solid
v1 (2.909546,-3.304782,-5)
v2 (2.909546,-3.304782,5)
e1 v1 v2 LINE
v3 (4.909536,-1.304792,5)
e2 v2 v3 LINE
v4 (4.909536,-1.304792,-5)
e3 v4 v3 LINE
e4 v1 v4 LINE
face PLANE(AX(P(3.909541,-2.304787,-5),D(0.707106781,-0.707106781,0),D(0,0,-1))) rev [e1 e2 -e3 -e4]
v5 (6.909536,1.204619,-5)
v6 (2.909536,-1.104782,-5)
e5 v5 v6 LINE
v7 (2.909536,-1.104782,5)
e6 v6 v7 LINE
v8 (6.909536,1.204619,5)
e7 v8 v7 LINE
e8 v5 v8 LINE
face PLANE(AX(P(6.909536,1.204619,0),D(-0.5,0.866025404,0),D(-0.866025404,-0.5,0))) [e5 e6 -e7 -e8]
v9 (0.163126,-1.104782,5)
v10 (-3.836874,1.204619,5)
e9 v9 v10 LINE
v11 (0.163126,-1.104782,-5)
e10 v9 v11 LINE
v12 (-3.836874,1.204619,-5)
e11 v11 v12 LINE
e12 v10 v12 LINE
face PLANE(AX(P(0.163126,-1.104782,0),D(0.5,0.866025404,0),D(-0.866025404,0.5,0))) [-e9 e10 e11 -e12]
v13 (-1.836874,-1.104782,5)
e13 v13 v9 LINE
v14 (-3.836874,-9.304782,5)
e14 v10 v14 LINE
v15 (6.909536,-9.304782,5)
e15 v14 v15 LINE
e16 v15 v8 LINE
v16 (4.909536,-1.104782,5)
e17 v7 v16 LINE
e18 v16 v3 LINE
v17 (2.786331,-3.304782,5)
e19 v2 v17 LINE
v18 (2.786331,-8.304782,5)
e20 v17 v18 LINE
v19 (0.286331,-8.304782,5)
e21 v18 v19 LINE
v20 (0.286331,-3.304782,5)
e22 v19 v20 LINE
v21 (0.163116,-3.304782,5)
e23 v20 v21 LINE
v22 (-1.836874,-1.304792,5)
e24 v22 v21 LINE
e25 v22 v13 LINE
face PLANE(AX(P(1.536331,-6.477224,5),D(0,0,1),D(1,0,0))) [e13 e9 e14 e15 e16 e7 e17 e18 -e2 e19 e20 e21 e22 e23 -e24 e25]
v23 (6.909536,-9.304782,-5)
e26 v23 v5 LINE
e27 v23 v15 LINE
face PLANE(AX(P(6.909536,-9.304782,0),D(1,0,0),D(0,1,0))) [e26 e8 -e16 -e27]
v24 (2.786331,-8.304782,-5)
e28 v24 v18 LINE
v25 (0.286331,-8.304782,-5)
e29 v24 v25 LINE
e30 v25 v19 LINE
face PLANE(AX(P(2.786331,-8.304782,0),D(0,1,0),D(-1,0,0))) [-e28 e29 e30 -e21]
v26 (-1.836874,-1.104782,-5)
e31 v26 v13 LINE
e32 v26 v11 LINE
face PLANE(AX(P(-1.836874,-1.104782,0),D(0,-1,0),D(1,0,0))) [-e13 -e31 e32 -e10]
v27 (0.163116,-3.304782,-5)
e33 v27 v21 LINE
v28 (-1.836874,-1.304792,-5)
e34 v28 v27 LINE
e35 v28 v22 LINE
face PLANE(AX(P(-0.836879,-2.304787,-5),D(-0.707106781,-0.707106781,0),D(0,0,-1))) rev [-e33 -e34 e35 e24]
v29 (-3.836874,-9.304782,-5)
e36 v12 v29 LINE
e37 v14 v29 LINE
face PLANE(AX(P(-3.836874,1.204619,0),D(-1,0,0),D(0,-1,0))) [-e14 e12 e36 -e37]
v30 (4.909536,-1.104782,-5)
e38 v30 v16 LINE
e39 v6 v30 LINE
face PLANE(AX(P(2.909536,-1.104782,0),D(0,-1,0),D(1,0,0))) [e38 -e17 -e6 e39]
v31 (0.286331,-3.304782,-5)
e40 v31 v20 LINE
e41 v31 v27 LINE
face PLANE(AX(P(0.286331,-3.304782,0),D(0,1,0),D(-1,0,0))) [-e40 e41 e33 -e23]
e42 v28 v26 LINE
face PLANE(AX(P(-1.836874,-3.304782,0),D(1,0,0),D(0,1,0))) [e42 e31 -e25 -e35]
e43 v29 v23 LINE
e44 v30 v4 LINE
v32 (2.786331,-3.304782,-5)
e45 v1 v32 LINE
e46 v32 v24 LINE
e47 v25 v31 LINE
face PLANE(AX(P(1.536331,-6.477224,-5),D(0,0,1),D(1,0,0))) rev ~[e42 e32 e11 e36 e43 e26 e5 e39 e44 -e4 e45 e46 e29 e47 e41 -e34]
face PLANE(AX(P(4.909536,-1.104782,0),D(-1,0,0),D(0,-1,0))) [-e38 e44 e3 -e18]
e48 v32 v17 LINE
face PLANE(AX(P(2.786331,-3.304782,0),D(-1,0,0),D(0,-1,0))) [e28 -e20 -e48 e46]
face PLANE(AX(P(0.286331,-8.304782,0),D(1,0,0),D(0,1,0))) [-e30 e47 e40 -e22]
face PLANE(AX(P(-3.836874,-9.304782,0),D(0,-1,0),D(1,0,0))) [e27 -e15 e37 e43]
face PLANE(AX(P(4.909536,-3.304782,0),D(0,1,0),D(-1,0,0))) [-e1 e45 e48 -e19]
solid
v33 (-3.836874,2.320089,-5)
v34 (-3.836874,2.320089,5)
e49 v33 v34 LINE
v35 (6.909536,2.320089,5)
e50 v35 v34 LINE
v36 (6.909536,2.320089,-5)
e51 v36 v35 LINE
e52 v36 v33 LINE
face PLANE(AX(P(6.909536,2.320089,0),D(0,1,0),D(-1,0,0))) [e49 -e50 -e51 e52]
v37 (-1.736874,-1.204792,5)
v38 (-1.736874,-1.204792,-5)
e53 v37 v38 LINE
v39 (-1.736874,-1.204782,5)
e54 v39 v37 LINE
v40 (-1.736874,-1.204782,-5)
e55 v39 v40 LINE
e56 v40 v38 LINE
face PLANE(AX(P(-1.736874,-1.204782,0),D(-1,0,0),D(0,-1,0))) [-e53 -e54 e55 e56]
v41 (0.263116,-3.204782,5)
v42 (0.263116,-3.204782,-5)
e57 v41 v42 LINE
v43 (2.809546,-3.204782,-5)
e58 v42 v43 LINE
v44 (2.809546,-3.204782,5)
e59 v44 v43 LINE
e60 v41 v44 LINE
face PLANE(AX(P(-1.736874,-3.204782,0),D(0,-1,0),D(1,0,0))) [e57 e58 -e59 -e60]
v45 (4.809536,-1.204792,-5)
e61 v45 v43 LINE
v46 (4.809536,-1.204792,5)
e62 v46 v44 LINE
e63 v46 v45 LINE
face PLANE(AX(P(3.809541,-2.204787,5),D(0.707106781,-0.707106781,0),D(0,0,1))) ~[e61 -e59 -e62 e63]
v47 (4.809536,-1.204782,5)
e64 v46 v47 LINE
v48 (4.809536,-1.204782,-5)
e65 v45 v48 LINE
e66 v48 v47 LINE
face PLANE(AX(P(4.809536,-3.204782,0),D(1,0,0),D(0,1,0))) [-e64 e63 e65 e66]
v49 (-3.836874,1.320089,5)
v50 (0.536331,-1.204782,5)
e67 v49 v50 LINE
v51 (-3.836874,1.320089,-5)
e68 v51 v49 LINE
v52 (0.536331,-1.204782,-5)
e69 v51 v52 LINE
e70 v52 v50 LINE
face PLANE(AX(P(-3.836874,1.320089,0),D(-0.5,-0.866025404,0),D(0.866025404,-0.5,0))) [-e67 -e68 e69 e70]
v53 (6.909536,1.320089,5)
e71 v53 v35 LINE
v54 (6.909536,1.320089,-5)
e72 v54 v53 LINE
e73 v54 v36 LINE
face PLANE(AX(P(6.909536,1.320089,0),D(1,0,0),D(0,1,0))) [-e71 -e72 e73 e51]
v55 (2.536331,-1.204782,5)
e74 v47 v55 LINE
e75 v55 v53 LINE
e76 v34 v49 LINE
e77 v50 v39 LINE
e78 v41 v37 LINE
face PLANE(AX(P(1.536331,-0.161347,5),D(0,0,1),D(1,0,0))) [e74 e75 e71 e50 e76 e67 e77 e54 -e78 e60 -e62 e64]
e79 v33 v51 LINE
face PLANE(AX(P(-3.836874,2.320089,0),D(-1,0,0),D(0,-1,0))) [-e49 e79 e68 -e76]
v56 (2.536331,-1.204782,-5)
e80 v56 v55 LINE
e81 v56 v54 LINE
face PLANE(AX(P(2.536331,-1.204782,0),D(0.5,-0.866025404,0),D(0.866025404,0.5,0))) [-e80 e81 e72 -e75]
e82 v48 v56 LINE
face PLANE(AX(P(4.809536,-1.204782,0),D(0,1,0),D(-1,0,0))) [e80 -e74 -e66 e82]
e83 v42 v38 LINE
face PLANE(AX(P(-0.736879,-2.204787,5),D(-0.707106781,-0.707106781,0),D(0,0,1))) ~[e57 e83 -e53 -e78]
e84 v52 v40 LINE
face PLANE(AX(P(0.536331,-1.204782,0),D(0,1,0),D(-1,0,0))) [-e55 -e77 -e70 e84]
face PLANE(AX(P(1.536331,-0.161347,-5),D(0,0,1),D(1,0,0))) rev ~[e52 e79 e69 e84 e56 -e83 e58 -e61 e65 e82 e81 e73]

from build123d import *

# Parameters (mm, degrees)
F1_DEPTH  = 5
F2_SIZE   = 1.99999
F2_2_SIZE = 1.99999


# Not quite as in the source:
# - a fillet or chamfer is up to 0.001 mm smaller than in the source, because OpenCascade refuses the exact size


with BuildPart() as f1:
    # F0 (on Top) → F1 (new body, symmetric)
    with BuildSketch(Plane.XY):
        Polygon((-3.8368740493, -3.3047820088), (-3.8368740493, -9.3047820088), (6.9095361123, -9.3047820088), (6.9095361123, -3.3047820088), (4.9095361123, -3.3047820088), (2.7863310315, -3.3047820088), (2.7863310315, -8.3047820088), (0.2863310315, -8.3047820088), (0.2863310315, -3.3047820088), (-1.8368740493, -3.3047820088), align=None)
        Polygon((4.9095361123, -3.3047820088), (6.9095361123, -3.3047820088), (6.9095361123, 1.204619068), (2.9095361123, -1.1047820088), (4.9095361123, -1.1047820088), align=None)
        Polygon((-3.8368740493, 1.204619068), (-3.8368740493, -3.3047820088), (-1.8368740493, -3.3047820088), (-1.8368740493, -1.1047820088), (0.1631259507, -1.1047820088), align=None)
    extrude(amount=F1_DEPTH, both=True)

    # F2 (size 2 in the source; OpenCascade refuses exactly that, so slightly less here)
    f2_edges = [f1.edges().sort_by_distance(p)[0] for p in [
        (4.909536, -3.304782, 0),
        (-1.836874, -3.304782, 0),
    ]]
    chamfer(f2_edges, length=F2_SIZE)


with BuildPart() as f1b:
    # F0 (on Top) → F1, piece 2 (new body, symmetric)
    with BuildSketch(Plane.XY):
        Polygon((4.8095361123, -3.2047820088), (4.8095361123, -1.2047820088), (2.5363310315, -1.2047820088), (6.9095361123, 1.3200891218), (6.9095361123, 2.3200891218), (1.5363310315, 2.3200891218), (-3.8368740493, 2.3200891218), (-3.8368740493, 1.3200891218), (0.5363310315, -1.2047820088), (-1.7368740493, -1.2047820088), (-1.7368740493, -3.2047820088), (1.5363310315, -3.2047820088), align=None)
    extrude(amount=F1_DEPTH, both=True)

    # F2#2 (size 2 in the source; OpenCascade refuses exactly that, so slightly less here)
    f2_2_edges = [f1b.edges().sort_by_distance(p)[0] for p in [
        (4.809536, -3.204782, 0),
        (-1.736874, -3.204782, 0),
    ]]
    chamfer(f2_2_edges, length=F2_2_SIZE)


solid = Compound([f1.part, f1b.part])
